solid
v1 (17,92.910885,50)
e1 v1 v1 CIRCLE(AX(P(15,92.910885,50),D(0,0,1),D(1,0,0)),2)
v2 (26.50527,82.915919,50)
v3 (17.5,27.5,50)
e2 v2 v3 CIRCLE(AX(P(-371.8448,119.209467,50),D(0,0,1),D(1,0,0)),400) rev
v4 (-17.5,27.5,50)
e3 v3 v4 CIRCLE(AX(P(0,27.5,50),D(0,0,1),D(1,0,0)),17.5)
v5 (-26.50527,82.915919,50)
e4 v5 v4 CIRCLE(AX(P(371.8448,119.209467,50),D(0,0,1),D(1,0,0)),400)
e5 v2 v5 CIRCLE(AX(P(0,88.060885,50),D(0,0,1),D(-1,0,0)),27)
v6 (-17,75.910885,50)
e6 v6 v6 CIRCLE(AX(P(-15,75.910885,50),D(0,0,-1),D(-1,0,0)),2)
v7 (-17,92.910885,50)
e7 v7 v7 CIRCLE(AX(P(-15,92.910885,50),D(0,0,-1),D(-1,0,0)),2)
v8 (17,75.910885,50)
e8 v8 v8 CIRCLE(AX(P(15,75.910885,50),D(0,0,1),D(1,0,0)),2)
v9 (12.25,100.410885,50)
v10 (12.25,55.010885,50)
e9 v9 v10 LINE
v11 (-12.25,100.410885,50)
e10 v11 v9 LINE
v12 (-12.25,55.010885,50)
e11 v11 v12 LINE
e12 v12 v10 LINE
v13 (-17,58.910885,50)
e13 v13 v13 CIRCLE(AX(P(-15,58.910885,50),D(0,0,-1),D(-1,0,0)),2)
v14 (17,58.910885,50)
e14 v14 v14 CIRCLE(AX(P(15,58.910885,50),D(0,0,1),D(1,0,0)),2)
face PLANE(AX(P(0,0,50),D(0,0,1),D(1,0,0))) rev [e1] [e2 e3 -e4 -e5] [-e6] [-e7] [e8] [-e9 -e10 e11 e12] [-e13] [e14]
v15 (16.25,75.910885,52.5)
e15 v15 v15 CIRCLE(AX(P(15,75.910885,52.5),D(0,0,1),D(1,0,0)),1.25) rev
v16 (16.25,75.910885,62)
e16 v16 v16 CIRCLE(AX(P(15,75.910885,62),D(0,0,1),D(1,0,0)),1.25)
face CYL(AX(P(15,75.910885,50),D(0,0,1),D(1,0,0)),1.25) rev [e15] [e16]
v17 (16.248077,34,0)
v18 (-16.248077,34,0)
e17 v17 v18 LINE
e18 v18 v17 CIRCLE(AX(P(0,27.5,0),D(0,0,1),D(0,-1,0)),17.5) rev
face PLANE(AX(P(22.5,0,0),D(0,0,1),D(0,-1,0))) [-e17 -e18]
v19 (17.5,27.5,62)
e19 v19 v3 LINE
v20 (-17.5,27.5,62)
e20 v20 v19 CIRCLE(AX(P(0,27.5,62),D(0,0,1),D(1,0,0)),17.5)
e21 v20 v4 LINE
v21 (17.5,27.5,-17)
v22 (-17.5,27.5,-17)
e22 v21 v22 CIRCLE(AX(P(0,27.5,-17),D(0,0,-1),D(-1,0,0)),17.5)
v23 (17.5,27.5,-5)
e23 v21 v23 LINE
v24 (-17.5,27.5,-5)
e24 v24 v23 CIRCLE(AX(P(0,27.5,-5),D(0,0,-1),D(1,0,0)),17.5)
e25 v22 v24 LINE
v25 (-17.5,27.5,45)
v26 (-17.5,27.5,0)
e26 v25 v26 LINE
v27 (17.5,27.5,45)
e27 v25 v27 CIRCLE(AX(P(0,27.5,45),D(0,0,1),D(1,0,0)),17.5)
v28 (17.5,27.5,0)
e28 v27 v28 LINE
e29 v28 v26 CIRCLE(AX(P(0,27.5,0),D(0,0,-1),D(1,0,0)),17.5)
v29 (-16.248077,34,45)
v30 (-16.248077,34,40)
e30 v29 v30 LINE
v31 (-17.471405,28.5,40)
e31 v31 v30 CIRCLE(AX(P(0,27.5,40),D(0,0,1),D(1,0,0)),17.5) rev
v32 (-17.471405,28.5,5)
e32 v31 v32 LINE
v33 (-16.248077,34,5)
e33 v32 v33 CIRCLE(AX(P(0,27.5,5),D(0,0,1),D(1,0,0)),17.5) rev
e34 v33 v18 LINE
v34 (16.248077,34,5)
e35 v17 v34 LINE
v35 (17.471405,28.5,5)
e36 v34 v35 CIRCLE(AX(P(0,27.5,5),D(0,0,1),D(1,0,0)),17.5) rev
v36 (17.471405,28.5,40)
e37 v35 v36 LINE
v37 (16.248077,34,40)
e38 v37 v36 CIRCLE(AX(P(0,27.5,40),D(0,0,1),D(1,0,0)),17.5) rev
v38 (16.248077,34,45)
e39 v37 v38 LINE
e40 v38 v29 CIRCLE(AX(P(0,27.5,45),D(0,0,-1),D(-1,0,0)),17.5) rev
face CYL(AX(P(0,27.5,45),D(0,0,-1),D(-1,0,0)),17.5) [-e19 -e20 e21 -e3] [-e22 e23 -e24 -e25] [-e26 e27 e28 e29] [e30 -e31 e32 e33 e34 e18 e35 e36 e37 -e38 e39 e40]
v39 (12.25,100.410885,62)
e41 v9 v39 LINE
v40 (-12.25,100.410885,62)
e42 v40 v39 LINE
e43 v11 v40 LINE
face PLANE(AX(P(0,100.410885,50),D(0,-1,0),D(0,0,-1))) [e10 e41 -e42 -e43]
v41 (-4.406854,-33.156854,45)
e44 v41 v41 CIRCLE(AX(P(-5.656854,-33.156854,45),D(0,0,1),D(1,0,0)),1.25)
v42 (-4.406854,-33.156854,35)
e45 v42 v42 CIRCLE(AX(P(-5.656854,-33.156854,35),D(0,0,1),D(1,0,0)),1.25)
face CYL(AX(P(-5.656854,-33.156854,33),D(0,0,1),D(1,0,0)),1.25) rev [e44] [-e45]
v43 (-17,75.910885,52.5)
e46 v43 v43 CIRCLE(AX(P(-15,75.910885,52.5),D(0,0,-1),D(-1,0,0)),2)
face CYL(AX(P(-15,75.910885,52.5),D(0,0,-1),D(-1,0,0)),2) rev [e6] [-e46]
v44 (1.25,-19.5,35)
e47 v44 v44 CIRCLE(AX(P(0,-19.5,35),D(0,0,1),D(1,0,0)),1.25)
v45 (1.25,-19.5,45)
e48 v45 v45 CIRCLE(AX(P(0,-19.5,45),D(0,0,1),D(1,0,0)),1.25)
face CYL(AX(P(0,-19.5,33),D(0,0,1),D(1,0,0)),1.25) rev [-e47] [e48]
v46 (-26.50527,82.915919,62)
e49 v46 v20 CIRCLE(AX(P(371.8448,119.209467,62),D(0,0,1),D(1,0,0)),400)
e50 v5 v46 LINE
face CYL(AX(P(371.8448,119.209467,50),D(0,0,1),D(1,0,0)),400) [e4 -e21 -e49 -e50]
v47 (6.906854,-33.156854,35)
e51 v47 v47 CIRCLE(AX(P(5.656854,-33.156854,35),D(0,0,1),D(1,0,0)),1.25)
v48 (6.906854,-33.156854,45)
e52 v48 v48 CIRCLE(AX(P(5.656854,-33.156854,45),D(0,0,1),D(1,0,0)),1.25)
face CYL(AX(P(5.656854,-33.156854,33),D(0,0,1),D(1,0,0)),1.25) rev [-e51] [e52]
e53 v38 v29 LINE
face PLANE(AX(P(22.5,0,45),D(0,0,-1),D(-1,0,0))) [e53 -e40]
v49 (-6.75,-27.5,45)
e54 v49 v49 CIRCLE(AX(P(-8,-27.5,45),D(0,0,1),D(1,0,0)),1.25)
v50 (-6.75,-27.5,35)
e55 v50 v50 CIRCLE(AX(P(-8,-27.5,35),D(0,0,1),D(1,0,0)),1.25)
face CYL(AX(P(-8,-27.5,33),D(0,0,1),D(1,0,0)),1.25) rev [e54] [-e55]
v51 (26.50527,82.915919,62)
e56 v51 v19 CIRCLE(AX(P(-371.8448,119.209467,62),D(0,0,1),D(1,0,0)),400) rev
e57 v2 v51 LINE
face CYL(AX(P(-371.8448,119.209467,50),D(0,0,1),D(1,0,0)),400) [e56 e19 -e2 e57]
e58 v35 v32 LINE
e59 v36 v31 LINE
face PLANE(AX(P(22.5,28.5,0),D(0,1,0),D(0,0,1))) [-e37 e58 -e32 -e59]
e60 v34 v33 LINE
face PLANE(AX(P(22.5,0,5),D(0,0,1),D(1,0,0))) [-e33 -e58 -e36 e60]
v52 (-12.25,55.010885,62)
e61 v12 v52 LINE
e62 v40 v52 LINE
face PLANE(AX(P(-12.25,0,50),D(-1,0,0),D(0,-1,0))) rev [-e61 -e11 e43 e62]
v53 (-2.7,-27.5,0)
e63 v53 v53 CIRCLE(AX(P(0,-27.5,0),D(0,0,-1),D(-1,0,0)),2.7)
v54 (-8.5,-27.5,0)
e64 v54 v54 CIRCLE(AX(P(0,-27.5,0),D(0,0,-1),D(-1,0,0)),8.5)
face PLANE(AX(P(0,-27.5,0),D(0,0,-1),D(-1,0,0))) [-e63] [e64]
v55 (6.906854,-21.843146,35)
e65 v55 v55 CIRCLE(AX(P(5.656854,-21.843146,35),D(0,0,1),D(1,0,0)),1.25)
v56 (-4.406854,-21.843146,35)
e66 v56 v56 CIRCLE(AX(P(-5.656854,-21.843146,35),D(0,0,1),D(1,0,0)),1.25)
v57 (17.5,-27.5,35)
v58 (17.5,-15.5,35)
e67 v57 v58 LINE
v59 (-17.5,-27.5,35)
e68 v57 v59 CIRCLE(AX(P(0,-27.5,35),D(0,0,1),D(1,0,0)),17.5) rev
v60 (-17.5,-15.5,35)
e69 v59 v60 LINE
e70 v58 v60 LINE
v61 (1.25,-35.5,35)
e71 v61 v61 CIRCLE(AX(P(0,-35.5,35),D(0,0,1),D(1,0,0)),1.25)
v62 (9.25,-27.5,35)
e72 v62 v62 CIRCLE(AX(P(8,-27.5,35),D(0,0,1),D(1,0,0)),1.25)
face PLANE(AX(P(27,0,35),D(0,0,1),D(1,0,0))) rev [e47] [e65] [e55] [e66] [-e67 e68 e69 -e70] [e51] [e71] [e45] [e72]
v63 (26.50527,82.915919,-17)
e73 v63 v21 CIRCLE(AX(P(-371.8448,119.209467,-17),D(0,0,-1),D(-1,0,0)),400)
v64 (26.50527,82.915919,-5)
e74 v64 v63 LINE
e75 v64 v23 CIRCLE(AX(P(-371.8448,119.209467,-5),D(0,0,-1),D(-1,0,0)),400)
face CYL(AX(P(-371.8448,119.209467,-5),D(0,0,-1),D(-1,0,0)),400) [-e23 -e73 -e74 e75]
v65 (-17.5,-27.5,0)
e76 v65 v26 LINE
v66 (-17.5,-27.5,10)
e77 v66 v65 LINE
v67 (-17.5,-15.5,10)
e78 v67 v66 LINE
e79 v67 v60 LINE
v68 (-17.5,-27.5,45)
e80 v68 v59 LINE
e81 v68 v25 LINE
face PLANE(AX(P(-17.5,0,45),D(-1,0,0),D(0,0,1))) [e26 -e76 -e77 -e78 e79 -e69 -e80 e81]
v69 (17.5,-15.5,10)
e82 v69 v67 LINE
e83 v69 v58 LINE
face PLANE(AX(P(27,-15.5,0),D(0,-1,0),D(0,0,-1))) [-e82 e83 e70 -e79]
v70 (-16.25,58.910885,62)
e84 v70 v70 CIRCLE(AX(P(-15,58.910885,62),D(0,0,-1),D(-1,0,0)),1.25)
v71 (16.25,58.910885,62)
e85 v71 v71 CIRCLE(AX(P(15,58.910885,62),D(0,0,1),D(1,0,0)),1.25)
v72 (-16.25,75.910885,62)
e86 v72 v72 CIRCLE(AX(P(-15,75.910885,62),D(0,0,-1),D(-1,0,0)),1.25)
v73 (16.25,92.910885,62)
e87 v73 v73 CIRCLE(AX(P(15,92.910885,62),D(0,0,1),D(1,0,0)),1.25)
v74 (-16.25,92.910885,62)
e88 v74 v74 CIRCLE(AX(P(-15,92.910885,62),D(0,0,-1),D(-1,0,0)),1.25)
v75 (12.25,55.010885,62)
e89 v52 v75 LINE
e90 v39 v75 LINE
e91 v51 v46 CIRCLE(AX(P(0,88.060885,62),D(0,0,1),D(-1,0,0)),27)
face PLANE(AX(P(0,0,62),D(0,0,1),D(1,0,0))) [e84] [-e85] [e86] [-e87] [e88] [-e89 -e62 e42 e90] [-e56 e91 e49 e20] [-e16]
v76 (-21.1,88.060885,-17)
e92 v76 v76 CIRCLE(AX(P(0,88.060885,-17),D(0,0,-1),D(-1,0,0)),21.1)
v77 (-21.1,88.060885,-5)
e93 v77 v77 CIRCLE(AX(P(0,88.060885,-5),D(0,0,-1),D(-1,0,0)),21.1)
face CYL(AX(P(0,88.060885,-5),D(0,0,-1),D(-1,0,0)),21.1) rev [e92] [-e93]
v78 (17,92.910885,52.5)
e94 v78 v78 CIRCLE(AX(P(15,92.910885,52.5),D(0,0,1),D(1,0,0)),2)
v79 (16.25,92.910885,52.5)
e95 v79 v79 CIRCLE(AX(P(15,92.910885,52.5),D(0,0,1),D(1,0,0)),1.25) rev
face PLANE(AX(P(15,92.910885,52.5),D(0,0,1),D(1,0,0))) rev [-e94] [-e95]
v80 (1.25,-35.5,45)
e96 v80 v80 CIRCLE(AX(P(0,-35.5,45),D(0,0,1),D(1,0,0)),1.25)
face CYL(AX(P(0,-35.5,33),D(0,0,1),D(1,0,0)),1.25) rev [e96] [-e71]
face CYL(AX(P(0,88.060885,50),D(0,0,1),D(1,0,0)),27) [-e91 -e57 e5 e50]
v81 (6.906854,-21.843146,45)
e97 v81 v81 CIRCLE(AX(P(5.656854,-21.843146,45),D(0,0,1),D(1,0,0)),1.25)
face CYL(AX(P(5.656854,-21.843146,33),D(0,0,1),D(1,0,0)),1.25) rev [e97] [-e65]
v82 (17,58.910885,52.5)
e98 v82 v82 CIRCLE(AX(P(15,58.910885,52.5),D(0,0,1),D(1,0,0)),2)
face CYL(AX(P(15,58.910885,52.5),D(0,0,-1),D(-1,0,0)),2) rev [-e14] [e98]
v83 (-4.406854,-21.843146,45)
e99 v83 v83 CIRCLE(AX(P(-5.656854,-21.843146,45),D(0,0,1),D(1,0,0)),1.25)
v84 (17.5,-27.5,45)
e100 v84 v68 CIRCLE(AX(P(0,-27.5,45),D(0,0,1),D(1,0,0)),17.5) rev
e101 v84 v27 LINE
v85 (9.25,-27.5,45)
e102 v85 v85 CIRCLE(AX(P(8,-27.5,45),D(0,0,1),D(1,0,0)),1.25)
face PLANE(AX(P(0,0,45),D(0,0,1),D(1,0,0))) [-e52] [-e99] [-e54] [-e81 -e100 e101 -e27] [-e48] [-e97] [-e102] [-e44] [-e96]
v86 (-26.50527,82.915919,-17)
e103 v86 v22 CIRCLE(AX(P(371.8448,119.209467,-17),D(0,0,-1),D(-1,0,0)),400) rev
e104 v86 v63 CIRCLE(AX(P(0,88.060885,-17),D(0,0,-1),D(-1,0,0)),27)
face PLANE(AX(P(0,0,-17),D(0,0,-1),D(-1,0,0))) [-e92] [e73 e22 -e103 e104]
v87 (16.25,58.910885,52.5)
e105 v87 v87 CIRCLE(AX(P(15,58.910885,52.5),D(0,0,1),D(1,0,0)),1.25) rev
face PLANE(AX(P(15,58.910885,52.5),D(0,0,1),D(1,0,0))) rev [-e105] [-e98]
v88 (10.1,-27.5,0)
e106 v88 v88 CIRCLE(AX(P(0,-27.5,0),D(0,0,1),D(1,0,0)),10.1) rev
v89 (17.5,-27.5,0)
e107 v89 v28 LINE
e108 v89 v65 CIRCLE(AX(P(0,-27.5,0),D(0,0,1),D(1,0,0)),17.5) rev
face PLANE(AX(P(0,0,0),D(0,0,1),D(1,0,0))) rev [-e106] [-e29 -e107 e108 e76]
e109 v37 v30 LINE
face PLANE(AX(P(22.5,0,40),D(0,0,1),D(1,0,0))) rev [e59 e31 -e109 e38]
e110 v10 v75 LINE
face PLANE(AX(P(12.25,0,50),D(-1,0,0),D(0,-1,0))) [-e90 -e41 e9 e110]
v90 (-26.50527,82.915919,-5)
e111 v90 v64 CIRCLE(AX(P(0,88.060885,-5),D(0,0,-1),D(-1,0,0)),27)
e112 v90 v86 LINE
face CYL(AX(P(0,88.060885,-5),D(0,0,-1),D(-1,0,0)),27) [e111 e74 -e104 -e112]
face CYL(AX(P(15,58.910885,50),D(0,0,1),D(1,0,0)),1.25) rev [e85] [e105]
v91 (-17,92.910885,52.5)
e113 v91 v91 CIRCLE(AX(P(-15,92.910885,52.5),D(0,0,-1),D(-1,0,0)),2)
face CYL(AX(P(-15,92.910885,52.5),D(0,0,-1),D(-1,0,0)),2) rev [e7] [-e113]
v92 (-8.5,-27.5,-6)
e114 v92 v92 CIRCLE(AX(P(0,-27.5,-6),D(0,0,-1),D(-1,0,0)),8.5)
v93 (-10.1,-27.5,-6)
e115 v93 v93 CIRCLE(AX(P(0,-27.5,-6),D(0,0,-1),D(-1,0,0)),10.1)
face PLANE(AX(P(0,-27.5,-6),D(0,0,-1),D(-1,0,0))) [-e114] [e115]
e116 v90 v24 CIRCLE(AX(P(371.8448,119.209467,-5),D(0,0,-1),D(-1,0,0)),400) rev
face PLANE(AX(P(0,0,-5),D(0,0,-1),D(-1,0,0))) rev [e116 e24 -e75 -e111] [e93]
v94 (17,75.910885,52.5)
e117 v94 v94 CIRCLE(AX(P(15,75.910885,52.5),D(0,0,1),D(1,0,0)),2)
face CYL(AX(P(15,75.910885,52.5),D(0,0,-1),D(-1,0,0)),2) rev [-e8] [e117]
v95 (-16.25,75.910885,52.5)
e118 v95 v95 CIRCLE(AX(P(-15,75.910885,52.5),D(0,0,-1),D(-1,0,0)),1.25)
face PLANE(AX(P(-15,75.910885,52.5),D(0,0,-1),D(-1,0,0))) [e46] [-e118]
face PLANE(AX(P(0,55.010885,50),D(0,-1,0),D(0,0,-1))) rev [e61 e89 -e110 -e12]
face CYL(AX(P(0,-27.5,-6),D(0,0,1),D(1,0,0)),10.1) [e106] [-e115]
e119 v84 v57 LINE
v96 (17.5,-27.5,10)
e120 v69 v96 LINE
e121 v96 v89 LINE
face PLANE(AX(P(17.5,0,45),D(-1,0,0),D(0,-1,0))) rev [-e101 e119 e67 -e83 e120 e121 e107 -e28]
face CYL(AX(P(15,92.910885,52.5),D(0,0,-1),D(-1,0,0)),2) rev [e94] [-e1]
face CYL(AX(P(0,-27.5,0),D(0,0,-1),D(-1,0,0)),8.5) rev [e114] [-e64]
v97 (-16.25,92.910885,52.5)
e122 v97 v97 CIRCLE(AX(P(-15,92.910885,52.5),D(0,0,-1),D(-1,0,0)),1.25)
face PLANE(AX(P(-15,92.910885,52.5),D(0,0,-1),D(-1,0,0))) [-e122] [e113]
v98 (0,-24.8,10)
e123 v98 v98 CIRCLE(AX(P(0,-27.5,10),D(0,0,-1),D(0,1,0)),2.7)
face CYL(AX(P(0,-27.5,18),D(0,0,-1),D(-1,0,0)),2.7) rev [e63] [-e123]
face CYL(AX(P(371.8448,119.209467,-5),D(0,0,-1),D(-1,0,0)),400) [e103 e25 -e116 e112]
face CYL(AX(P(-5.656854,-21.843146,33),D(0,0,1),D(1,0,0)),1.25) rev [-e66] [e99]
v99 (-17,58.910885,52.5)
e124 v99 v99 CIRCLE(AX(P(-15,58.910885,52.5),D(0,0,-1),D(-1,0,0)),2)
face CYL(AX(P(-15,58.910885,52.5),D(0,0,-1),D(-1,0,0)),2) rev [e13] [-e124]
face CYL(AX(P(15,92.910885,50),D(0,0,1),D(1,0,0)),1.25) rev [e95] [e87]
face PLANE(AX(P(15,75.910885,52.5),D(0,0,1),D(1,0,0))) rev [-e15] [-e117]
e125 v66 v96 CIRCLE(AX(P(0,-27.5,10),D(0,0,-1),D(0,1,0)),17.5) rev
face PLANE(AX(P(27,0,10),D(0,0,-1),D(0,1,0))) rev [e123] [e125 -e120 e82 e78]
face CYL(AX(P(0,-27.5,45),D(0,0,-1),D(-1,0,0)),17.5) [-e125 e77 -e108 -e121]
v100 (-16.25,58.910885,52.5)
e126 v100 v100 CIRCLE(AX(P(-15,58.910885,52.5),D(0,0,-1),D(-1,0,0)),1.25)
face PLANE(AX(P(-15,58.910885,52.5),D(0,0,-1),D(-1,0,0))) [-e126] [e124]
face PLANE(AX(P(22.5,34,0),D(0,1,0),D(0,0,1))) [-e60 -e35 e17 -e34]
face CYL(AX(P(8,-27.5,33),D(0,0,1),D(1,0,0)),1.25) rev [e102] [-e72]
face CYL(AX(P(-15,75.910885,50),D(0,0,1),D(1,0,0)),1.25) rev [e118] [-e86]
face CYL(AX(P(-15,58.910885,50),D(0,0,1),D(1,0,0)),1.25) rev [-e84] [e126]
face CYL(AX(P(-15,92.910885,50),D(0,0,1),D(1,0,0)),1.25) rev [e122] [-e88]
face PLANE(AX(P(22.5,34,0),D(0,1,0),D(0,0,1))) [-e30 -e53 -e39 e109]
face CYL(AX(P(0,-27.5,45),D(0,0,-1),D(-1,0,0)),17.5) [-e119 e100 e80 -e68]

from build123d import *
from build123d.topology import SkipClean

# Parameters (mm, degrees)
SKETCH2_W            = 35
SKETCH2_H            = 55
BOSS_EXTRUDE1_DEPTH  = 45
BOSS_EXTRUDE2_DEPTH  = 5
SKETCH6_R            = 17.5
BOSS_EXTRUDE3_DEPTH  = 12
BOSS_EXTRUDE4_START  = 5
BOSS_EXTRUDE4_DEPTH  = 5
BOSS_EXTRUDE5_START  = 12
SKETCH8_R            = 17.5
BOSS_EXTRUDE5_DEPTH  = 12
BOSS_EXTRUDE6_START  = -12
BOSS_EXTRUDE6_DEPTH  = 12
BOSS_EXTRUDE7_DEPTH  = 12
SKETCH14_W           = 24.5
SKETCH14_H           = 45.4
SKETCH14_R           = 2.449946242
CUT_EXTRUDE3_DEPTH   = 12
SKETCH15_R           = 21.1
CUT_EXTRUDE4_DEPTH   = 12
CUT_EXTRUDE5_DEPTH   = 139.069755203
SKETCH21_R           = 1.25
CUT_EXTRUDE7_DEPTH   = 12
SKETCH23_R           = 10.1
BOSS_EXTRUDE8_DEPTH  = 6
SKETCH24_R           = 8.5
CUT_EXTRUDE8_DEPTH   = 6
SKETCH25_R           = 2.7
CUT_EXTRUDE9_DEPTH   = 18
BOSS_EXTRUDE9_START  = -12
BOSS_EXTRUDE9_DEPTH  = 12
SKETCH30_R           = 1.25
CUT_EXTRUDE11_DEPTH  = 12
SKETCH31_R           = 2
CUT_EXTRUDE12_DEPTH  = 2.5
BOSS_EXTRUDE11_DEPTH = 12
SKETCH33_W           = 17.5
SKETCH33_H           = 5.5
SKETCH33_W_2         = 45
SKETCH33_H_2         = 11
CUT_EXTRUDE13_DEPTH  = 40


with BuildPart() as part:
    # Sketch2 → Boss-Extrude1 (new body)
    with BuildSketch(Plane.XY):
        with BuildLine():
            ThreePointArc((-17.5, 27.5), (0, 45), (17.5, 27.5))
            Line((17.5, 27.5), (-17.5, 27.5))
        make_face()
        Rectangle(SKETCH2_W, SKETCH2_H)
        with BuildLine():
            ThreePointArc((17.5, -27.5), (0, -45), (-17.5, -27.5))
            Line((-17.5, -27.5), (17.5, -27.5))
        make_face()
    extrude(amount=BOSS_EXTRUDE1_DEPTH)

    # Sketch5 → Boss-Extrude2 (add)
    with SkipClean():  # the faces are left unmerged after this step: merging them gives an invalid solid
        with BuildSketch(Plane.XY.offset(45)):
            with BuildLine():
                ThreePointArc((17.5, 27.5), (0, 45), (-17.5, 27.5))
                ThreePointArc((-17.5, 27.5), (0, 10), (17.5, 27.5))
            make_face()
        extrude(amount=BOSS_EXTRUDE2_DEPTH)

    # Sketch6 → Boss-Extrude3 (add)
    with BuildSketch(Plane.XY.offset(50)):
        with BuildLine():
            Line((-17.5, 67.5), (17.5, 67.5))
            ThreePointArc((17.5, 67.5), (0, 85), (-17.5, 67.5))
        make_face()
        with BuildLine():
            Line((17.5, 27.5), (17.5, 67.5))
            Line((17.5, 67.5), (-17.5, 67.5))
            Line((-17.5, 67.5), (-17.5, 27.5))
            ThreePointArc((-17.5, 27.5), (0, 45), (17.5, 27.5))
        make_face()
        with Locations(Location((0, 27.5, 0), (0, 0, 180))):
            Circle(SKETCH6_R)
    extrude(amount=BOSS_EXTRUDE3_DEPTH)

    # Sketch7 → Boss-Extrude4 (add)
    with SkipClean():  # the faces are left unmerged after this step: merging them gives an invalid solid
        with BuildSketch(Plane(origin=(0, 0, 0), x_dir=(-1, 0, 0), z_dir=(0, 0, -1)).offset(BOSS_EXTRUDE4_START)):
            with BuildLine():
                ThreePointArc((17.5, 27.5), (0, 10), (-17.5, 27.5))
                ThreePointArc((-17.5, 27.5), (0, 45), (17.5, 27.5))
            make_face()
        extrude(amount=-BOSS_EXTRUDE4_DEPTH)
    add(part.part.scale(1), mode=Mode.REPLACE)  # the faces are merged on a copy

    # Sketch8 → Boss-Extrude5 (add)
    with SkipClean():  # the faces are left unmerged after this step: merging them gives an invalid solid
        with BuildSketch(Plane(origin=(0, 0, -5), x_dir=(-1, 0, 0), z_dir=(0, 0, -1)).offset(BOSS_EXTRUDE5_START)):
            with BuildLine():
                Line((17.5, 67.5), (-17.5, 67.5))
                ThreePointArc((-17.5, 67.5), (0, 85), (17.5, 67.5))
            make_face()
            with BuildLine():
                ThreePointArc((-17.5, 27.5), (0, 45), (17.5, 27.5))
                Line((17.5, 27.5), (17.5, 67.5))
                Line((17.5, 67.5), (-17.5, 67.5))
                Line((-17.5, 67.5), (-17.5, 27.5))
            make_face()
            with Locations((0, 27.5)):
                Circle(SKETCH8_R)
        extrude(amount=-BOSS_EXTRUDE5_DEPTH)

    # Sketch11 → Boss-Extrude6 (add)
    with BuildSketch(Plane.XY.offset(62).offset(BOSS_EXTRUDE6_START)):
        with BuildLine():
            Line((-17.5, 67.5), (-17.5, 27.5))
            ThreePointArc((-17.5, 27.5), (0, 10), (17.5, 27.5))
            Line((17.5, 27.5), (17.5, 67.5))
            ThreePointArc((17.5, 67.5), (0, 115.060885195), (-17.5, 67.5))
        make_face()
    extrude(amount=BOSS_EXTRUDE6_DEPTH)

    # Sketch12 → Boss-Extrude7 (add)
    with BuildSketch(Plane(origin=(0, 0, -17), x_dir=(-1, 0, 0), z_dir=(0, 0, -1))):
        with BuildLine():
            ThreePointArc((17.5, 67.5), (0, 115.060885195), (-17.5, 67.5))
            ThreePointArc((-17.5, 67.5), (0, 85), (17.5, 67.5))
        make_face()
    extrude(amount=-BOSS_EXTRUDE7_DEPTH)

    # Sketch14 → Cut-Extrude3 (cut)
    # profile 1 of 2: a face of its own
    with BuildSketch(Plane.XY.offset(62)):
        with Locations((0, 77.710885195)):
            Rectangle(SKETCH14_W, SKETCH14_H)
        with Locations((0, 88.060885195)):
            Circle(SKETCH14_R, mode=Mode.SUBTRACT)
    # profile 2 of 2: a face of its own
    with BuildSketch(Plane.XY.offset(62)):
        with Locations((0, 88.060885195)):
            Circle(SKETCH14_R)
    extrude(amount=-CUT_EXTRUDE3_DEPTH, mode=Mode.SUBTRACT)

    # Sketch15 → Cut-Extrude4 (cut)
    with BuildSketch(Plane(origin=(0, 0, -17), x_dir=(-1, 0, 0), z_dir=(0, 0, -1))):
        with Locations((0, 88.060885195)):
            Circle(SKETCH15_R)
    extrude(amount=-CUT_EXTRUDE4_DEPTH, mode=Mode.SUBTRACT)

    # Sketch17 → Cut-Extrude5 (cut, through all)
    with BuildSketch(Plane.ZY.offset(17.5)):
        Polygon((10, -27.5), (22.5, -27.5), (35, -27.5), (35, -15.5), (10, -15.5), align=None)
        Polygon((35, -27.5), (22.5, -27.5), (10, -27.5), (10, -45), (35, -45), align=None)
    extrude(amount=-CUT_EXTRUDE5_DEPTH, mode=Mode.SUBTRACT)

    # Sketch21 → Cut-Extrude7 (cut)
    with BuildSketch(Plane.XY.offset(45)):
        with Locations((8, -27.5)):
            Circle(SKETCH21_R)
        with Locations((5.656854249, -33.156854249)):
            Circle(SKETCH21_R)
        with Locations((0, -35.5)):
            Circle(SKETCH21_R)
        with Locations((-5.656854249, -33.156854249)):
            Circle(SKETCH21_R)
        with Locations((-8, -27.5)):
            Circle(SKETCH21_R)
        with Locations((-5.656854249, -21.843145751)):
            Circle(SKETCH21_R)
        with Locations((0, -19.5)):
            Circle(SKETCH21_R)
        with Locations((5.656854249, -21.843145751)):
            Circle(SKETCH21_R)
    extrude(amount=-CUT_EXTRUDE7_DEPTH, mode=Mode.SUBTRACT)

    # Sketch23 → Boss-Extrude8 (add)
    with BuildSketch(Plane(origin=(0, 0, 0), x_dir=(-1, 0, 0), z_dir=(0, 0, -1))):
        with Locations(Location((0, -27.5, 0), (0, 0, 180))):
            Circle(SKETCH23_R)
    extrude(amount=BOSS_EXTRUDE8_DEPTH)

    # Sketch24 → Cut-Extrude8 (cut)
    with BuildSketch(Plane(origin=(0, 0, -6), x_dir=(-1, 0, 0), z_dir=(0, 0, -1))):
        with Locations((0, -27.5)):
            Circle(SKETCH24_R)
    extrude(amount=-CUT_EXTRUDE8_DEPTH, mode=Mode.SUBTRACT)

    # Sketch25 → Cut-Extrude9 (cut)
    with BuildSketch(Plane(origin=(0, 0, 0), x_dir=(-1, 0, 0), z_dir=(0, 0, -1))):
        with Locations((0, -27.5)):
            Circle(SKETCH25_R)
    extrude(amount=-CUT_EXTRUDE9_DEPTH, mode=Mode.SUBTRACT)

    # Sketch26 → Boss-Extrude9 (add)
    with BuildSketch(Plane.XY.offset(62).offset(BOSS_EXTRUDE9_START)):
        with BuildLine():
            ThreePointArc((-17.5, 67.5), (-23.313699367, 74.442095901), (-26.505269682, 82.915918813))
            ThreePointArc((-26.505269682, 82.915918813), (-22.976087169, 55.049770191), (-17.5, 27.5))
            Line((-17.5, 27.5), (-17.5, 67.5))
        make_face()
        with BuildLine():
            ThreePointArc((17.5, 27.5), (22.976087169, 55.049770191), (26.505269682, 82.915918813))
            ThreePointArc((26.505269682, 82.915918813), (23.313699367, 74.442095901), (17.5, 67.5))
            Line((17.5, 67.5), (17.5, 27.5))
        make_face()
    extrude(amount=BOSS_EXTRUDE9_DEPTH)

    # Sketch30 → Cut-Extrude11 (cut)
    with BuildSketch(Plane.XY.offset(62)):
        with Locations((15, 92.910885195)):
            Circle(SKETCH30_R)
        with Locations((15, 75.910885195)):
            Circle(SKETCH30_R)
        with Locations((15, 58.910885195)):
            Circle(SKETCH30_R)
        with Locations(Location((-15, 92.910885195, 0), (0, 0, 180))):
            Circle(SKETCH30_R)
        with Locations(Location((-15, 75.910885195, 0), (0, 0, 180))):
            Circle(SKETCH30_R)
        with Locations(Location((-15, 58.910885195, 0), (0, 0, 180))):
            Circle(SKETCH30_R)
    extrude(amount=-CUT_EXTRUDE11_DEPTH, mode=Mode.SUBTRACT)

    # Sketch31 → Cut-Extrude12 (cut)
    with BuildSketch(Plane(origin=(0, 0, 50), x_dir=(-1, 0, 0), z_dir=(0, 0, -1))):
        with Locations((15, 92.910885195)):
            Circle(SKETCH31_R)
        with Locations((15, 75.910885195)):
            Circle(SKETCH31_R)
        with Locations((15, 58.910885195)):
            Circle(SKETCH31_R)
        with Locations(Location((-15, 58.910885195, 0), (0, 0, 180))):
            Circle(SKETCH31_R)
        with Locations(Location((-15, 75.910885195, 0), (0, 0, 180))):
            Circle(SKETCH31_R)
        with Locations(Location((-15, 92.910885195, 0), (0, 0, 180))):
            Circle(SKETCH31_R)
    extrude(amount=-CUT_EXTRUDE12_DEPTH, mode=Mode.SUBTRACT)

    # Sketch32 → Boss-Extrude11 (add)
    with BuildSketch(Plane(origin=(0, 0, -17), x_dir=(-1, 0, 0), z_dir=(0, 0, -1))):
        with BuildLine():
            ThreePointArc((-17.5, 67.5), (-23.313699367, 74.442095901), (-26.505269682, 82.915918813))
            ThreePointArc((-26.505269682, 82.915918813), (-22.976087169, 55.049770191), (-17.5, 27.5))
            Line((-17.5, 27.5), (-17.5, 67.5))
        make_face()
        with BuildLine():
            ThreePointArc((17.5, 27.5), (22.976087169, 55.049770191), (26.505269682, 82.915918813))
            ThreePointArc((26.505269682, 82.915918813), (23.313699367, 74.442095901), (17.5, 67.5))
            Line((17.5, 67.5), (17.5, 27.5))
        make_face()
    extrude(amount=-BOSS_EXTRUDE11_DEPTH)

    # Sketch33 → Cut-Extrude13 (cut)
    with BuildSketch(Plane.ZY.offset(17.5)):
        with Locations((13.75, 31.25)):
            Rectangle(SKETCH33_W, SKETCH33_H)
        with Locations((31.25, 31.25)):
            Rectangle(SKETCH33_W, SKETCH33_H)
        with Locations((22.5, 39.5)):
            Rectangle(SKETCH33_W_2, SKETCH33_H_2)
    extrude(amount=-CUT_EXTRUDE13_DEPTH, mode=Mode.SUBTRACT)


solid = part.part
